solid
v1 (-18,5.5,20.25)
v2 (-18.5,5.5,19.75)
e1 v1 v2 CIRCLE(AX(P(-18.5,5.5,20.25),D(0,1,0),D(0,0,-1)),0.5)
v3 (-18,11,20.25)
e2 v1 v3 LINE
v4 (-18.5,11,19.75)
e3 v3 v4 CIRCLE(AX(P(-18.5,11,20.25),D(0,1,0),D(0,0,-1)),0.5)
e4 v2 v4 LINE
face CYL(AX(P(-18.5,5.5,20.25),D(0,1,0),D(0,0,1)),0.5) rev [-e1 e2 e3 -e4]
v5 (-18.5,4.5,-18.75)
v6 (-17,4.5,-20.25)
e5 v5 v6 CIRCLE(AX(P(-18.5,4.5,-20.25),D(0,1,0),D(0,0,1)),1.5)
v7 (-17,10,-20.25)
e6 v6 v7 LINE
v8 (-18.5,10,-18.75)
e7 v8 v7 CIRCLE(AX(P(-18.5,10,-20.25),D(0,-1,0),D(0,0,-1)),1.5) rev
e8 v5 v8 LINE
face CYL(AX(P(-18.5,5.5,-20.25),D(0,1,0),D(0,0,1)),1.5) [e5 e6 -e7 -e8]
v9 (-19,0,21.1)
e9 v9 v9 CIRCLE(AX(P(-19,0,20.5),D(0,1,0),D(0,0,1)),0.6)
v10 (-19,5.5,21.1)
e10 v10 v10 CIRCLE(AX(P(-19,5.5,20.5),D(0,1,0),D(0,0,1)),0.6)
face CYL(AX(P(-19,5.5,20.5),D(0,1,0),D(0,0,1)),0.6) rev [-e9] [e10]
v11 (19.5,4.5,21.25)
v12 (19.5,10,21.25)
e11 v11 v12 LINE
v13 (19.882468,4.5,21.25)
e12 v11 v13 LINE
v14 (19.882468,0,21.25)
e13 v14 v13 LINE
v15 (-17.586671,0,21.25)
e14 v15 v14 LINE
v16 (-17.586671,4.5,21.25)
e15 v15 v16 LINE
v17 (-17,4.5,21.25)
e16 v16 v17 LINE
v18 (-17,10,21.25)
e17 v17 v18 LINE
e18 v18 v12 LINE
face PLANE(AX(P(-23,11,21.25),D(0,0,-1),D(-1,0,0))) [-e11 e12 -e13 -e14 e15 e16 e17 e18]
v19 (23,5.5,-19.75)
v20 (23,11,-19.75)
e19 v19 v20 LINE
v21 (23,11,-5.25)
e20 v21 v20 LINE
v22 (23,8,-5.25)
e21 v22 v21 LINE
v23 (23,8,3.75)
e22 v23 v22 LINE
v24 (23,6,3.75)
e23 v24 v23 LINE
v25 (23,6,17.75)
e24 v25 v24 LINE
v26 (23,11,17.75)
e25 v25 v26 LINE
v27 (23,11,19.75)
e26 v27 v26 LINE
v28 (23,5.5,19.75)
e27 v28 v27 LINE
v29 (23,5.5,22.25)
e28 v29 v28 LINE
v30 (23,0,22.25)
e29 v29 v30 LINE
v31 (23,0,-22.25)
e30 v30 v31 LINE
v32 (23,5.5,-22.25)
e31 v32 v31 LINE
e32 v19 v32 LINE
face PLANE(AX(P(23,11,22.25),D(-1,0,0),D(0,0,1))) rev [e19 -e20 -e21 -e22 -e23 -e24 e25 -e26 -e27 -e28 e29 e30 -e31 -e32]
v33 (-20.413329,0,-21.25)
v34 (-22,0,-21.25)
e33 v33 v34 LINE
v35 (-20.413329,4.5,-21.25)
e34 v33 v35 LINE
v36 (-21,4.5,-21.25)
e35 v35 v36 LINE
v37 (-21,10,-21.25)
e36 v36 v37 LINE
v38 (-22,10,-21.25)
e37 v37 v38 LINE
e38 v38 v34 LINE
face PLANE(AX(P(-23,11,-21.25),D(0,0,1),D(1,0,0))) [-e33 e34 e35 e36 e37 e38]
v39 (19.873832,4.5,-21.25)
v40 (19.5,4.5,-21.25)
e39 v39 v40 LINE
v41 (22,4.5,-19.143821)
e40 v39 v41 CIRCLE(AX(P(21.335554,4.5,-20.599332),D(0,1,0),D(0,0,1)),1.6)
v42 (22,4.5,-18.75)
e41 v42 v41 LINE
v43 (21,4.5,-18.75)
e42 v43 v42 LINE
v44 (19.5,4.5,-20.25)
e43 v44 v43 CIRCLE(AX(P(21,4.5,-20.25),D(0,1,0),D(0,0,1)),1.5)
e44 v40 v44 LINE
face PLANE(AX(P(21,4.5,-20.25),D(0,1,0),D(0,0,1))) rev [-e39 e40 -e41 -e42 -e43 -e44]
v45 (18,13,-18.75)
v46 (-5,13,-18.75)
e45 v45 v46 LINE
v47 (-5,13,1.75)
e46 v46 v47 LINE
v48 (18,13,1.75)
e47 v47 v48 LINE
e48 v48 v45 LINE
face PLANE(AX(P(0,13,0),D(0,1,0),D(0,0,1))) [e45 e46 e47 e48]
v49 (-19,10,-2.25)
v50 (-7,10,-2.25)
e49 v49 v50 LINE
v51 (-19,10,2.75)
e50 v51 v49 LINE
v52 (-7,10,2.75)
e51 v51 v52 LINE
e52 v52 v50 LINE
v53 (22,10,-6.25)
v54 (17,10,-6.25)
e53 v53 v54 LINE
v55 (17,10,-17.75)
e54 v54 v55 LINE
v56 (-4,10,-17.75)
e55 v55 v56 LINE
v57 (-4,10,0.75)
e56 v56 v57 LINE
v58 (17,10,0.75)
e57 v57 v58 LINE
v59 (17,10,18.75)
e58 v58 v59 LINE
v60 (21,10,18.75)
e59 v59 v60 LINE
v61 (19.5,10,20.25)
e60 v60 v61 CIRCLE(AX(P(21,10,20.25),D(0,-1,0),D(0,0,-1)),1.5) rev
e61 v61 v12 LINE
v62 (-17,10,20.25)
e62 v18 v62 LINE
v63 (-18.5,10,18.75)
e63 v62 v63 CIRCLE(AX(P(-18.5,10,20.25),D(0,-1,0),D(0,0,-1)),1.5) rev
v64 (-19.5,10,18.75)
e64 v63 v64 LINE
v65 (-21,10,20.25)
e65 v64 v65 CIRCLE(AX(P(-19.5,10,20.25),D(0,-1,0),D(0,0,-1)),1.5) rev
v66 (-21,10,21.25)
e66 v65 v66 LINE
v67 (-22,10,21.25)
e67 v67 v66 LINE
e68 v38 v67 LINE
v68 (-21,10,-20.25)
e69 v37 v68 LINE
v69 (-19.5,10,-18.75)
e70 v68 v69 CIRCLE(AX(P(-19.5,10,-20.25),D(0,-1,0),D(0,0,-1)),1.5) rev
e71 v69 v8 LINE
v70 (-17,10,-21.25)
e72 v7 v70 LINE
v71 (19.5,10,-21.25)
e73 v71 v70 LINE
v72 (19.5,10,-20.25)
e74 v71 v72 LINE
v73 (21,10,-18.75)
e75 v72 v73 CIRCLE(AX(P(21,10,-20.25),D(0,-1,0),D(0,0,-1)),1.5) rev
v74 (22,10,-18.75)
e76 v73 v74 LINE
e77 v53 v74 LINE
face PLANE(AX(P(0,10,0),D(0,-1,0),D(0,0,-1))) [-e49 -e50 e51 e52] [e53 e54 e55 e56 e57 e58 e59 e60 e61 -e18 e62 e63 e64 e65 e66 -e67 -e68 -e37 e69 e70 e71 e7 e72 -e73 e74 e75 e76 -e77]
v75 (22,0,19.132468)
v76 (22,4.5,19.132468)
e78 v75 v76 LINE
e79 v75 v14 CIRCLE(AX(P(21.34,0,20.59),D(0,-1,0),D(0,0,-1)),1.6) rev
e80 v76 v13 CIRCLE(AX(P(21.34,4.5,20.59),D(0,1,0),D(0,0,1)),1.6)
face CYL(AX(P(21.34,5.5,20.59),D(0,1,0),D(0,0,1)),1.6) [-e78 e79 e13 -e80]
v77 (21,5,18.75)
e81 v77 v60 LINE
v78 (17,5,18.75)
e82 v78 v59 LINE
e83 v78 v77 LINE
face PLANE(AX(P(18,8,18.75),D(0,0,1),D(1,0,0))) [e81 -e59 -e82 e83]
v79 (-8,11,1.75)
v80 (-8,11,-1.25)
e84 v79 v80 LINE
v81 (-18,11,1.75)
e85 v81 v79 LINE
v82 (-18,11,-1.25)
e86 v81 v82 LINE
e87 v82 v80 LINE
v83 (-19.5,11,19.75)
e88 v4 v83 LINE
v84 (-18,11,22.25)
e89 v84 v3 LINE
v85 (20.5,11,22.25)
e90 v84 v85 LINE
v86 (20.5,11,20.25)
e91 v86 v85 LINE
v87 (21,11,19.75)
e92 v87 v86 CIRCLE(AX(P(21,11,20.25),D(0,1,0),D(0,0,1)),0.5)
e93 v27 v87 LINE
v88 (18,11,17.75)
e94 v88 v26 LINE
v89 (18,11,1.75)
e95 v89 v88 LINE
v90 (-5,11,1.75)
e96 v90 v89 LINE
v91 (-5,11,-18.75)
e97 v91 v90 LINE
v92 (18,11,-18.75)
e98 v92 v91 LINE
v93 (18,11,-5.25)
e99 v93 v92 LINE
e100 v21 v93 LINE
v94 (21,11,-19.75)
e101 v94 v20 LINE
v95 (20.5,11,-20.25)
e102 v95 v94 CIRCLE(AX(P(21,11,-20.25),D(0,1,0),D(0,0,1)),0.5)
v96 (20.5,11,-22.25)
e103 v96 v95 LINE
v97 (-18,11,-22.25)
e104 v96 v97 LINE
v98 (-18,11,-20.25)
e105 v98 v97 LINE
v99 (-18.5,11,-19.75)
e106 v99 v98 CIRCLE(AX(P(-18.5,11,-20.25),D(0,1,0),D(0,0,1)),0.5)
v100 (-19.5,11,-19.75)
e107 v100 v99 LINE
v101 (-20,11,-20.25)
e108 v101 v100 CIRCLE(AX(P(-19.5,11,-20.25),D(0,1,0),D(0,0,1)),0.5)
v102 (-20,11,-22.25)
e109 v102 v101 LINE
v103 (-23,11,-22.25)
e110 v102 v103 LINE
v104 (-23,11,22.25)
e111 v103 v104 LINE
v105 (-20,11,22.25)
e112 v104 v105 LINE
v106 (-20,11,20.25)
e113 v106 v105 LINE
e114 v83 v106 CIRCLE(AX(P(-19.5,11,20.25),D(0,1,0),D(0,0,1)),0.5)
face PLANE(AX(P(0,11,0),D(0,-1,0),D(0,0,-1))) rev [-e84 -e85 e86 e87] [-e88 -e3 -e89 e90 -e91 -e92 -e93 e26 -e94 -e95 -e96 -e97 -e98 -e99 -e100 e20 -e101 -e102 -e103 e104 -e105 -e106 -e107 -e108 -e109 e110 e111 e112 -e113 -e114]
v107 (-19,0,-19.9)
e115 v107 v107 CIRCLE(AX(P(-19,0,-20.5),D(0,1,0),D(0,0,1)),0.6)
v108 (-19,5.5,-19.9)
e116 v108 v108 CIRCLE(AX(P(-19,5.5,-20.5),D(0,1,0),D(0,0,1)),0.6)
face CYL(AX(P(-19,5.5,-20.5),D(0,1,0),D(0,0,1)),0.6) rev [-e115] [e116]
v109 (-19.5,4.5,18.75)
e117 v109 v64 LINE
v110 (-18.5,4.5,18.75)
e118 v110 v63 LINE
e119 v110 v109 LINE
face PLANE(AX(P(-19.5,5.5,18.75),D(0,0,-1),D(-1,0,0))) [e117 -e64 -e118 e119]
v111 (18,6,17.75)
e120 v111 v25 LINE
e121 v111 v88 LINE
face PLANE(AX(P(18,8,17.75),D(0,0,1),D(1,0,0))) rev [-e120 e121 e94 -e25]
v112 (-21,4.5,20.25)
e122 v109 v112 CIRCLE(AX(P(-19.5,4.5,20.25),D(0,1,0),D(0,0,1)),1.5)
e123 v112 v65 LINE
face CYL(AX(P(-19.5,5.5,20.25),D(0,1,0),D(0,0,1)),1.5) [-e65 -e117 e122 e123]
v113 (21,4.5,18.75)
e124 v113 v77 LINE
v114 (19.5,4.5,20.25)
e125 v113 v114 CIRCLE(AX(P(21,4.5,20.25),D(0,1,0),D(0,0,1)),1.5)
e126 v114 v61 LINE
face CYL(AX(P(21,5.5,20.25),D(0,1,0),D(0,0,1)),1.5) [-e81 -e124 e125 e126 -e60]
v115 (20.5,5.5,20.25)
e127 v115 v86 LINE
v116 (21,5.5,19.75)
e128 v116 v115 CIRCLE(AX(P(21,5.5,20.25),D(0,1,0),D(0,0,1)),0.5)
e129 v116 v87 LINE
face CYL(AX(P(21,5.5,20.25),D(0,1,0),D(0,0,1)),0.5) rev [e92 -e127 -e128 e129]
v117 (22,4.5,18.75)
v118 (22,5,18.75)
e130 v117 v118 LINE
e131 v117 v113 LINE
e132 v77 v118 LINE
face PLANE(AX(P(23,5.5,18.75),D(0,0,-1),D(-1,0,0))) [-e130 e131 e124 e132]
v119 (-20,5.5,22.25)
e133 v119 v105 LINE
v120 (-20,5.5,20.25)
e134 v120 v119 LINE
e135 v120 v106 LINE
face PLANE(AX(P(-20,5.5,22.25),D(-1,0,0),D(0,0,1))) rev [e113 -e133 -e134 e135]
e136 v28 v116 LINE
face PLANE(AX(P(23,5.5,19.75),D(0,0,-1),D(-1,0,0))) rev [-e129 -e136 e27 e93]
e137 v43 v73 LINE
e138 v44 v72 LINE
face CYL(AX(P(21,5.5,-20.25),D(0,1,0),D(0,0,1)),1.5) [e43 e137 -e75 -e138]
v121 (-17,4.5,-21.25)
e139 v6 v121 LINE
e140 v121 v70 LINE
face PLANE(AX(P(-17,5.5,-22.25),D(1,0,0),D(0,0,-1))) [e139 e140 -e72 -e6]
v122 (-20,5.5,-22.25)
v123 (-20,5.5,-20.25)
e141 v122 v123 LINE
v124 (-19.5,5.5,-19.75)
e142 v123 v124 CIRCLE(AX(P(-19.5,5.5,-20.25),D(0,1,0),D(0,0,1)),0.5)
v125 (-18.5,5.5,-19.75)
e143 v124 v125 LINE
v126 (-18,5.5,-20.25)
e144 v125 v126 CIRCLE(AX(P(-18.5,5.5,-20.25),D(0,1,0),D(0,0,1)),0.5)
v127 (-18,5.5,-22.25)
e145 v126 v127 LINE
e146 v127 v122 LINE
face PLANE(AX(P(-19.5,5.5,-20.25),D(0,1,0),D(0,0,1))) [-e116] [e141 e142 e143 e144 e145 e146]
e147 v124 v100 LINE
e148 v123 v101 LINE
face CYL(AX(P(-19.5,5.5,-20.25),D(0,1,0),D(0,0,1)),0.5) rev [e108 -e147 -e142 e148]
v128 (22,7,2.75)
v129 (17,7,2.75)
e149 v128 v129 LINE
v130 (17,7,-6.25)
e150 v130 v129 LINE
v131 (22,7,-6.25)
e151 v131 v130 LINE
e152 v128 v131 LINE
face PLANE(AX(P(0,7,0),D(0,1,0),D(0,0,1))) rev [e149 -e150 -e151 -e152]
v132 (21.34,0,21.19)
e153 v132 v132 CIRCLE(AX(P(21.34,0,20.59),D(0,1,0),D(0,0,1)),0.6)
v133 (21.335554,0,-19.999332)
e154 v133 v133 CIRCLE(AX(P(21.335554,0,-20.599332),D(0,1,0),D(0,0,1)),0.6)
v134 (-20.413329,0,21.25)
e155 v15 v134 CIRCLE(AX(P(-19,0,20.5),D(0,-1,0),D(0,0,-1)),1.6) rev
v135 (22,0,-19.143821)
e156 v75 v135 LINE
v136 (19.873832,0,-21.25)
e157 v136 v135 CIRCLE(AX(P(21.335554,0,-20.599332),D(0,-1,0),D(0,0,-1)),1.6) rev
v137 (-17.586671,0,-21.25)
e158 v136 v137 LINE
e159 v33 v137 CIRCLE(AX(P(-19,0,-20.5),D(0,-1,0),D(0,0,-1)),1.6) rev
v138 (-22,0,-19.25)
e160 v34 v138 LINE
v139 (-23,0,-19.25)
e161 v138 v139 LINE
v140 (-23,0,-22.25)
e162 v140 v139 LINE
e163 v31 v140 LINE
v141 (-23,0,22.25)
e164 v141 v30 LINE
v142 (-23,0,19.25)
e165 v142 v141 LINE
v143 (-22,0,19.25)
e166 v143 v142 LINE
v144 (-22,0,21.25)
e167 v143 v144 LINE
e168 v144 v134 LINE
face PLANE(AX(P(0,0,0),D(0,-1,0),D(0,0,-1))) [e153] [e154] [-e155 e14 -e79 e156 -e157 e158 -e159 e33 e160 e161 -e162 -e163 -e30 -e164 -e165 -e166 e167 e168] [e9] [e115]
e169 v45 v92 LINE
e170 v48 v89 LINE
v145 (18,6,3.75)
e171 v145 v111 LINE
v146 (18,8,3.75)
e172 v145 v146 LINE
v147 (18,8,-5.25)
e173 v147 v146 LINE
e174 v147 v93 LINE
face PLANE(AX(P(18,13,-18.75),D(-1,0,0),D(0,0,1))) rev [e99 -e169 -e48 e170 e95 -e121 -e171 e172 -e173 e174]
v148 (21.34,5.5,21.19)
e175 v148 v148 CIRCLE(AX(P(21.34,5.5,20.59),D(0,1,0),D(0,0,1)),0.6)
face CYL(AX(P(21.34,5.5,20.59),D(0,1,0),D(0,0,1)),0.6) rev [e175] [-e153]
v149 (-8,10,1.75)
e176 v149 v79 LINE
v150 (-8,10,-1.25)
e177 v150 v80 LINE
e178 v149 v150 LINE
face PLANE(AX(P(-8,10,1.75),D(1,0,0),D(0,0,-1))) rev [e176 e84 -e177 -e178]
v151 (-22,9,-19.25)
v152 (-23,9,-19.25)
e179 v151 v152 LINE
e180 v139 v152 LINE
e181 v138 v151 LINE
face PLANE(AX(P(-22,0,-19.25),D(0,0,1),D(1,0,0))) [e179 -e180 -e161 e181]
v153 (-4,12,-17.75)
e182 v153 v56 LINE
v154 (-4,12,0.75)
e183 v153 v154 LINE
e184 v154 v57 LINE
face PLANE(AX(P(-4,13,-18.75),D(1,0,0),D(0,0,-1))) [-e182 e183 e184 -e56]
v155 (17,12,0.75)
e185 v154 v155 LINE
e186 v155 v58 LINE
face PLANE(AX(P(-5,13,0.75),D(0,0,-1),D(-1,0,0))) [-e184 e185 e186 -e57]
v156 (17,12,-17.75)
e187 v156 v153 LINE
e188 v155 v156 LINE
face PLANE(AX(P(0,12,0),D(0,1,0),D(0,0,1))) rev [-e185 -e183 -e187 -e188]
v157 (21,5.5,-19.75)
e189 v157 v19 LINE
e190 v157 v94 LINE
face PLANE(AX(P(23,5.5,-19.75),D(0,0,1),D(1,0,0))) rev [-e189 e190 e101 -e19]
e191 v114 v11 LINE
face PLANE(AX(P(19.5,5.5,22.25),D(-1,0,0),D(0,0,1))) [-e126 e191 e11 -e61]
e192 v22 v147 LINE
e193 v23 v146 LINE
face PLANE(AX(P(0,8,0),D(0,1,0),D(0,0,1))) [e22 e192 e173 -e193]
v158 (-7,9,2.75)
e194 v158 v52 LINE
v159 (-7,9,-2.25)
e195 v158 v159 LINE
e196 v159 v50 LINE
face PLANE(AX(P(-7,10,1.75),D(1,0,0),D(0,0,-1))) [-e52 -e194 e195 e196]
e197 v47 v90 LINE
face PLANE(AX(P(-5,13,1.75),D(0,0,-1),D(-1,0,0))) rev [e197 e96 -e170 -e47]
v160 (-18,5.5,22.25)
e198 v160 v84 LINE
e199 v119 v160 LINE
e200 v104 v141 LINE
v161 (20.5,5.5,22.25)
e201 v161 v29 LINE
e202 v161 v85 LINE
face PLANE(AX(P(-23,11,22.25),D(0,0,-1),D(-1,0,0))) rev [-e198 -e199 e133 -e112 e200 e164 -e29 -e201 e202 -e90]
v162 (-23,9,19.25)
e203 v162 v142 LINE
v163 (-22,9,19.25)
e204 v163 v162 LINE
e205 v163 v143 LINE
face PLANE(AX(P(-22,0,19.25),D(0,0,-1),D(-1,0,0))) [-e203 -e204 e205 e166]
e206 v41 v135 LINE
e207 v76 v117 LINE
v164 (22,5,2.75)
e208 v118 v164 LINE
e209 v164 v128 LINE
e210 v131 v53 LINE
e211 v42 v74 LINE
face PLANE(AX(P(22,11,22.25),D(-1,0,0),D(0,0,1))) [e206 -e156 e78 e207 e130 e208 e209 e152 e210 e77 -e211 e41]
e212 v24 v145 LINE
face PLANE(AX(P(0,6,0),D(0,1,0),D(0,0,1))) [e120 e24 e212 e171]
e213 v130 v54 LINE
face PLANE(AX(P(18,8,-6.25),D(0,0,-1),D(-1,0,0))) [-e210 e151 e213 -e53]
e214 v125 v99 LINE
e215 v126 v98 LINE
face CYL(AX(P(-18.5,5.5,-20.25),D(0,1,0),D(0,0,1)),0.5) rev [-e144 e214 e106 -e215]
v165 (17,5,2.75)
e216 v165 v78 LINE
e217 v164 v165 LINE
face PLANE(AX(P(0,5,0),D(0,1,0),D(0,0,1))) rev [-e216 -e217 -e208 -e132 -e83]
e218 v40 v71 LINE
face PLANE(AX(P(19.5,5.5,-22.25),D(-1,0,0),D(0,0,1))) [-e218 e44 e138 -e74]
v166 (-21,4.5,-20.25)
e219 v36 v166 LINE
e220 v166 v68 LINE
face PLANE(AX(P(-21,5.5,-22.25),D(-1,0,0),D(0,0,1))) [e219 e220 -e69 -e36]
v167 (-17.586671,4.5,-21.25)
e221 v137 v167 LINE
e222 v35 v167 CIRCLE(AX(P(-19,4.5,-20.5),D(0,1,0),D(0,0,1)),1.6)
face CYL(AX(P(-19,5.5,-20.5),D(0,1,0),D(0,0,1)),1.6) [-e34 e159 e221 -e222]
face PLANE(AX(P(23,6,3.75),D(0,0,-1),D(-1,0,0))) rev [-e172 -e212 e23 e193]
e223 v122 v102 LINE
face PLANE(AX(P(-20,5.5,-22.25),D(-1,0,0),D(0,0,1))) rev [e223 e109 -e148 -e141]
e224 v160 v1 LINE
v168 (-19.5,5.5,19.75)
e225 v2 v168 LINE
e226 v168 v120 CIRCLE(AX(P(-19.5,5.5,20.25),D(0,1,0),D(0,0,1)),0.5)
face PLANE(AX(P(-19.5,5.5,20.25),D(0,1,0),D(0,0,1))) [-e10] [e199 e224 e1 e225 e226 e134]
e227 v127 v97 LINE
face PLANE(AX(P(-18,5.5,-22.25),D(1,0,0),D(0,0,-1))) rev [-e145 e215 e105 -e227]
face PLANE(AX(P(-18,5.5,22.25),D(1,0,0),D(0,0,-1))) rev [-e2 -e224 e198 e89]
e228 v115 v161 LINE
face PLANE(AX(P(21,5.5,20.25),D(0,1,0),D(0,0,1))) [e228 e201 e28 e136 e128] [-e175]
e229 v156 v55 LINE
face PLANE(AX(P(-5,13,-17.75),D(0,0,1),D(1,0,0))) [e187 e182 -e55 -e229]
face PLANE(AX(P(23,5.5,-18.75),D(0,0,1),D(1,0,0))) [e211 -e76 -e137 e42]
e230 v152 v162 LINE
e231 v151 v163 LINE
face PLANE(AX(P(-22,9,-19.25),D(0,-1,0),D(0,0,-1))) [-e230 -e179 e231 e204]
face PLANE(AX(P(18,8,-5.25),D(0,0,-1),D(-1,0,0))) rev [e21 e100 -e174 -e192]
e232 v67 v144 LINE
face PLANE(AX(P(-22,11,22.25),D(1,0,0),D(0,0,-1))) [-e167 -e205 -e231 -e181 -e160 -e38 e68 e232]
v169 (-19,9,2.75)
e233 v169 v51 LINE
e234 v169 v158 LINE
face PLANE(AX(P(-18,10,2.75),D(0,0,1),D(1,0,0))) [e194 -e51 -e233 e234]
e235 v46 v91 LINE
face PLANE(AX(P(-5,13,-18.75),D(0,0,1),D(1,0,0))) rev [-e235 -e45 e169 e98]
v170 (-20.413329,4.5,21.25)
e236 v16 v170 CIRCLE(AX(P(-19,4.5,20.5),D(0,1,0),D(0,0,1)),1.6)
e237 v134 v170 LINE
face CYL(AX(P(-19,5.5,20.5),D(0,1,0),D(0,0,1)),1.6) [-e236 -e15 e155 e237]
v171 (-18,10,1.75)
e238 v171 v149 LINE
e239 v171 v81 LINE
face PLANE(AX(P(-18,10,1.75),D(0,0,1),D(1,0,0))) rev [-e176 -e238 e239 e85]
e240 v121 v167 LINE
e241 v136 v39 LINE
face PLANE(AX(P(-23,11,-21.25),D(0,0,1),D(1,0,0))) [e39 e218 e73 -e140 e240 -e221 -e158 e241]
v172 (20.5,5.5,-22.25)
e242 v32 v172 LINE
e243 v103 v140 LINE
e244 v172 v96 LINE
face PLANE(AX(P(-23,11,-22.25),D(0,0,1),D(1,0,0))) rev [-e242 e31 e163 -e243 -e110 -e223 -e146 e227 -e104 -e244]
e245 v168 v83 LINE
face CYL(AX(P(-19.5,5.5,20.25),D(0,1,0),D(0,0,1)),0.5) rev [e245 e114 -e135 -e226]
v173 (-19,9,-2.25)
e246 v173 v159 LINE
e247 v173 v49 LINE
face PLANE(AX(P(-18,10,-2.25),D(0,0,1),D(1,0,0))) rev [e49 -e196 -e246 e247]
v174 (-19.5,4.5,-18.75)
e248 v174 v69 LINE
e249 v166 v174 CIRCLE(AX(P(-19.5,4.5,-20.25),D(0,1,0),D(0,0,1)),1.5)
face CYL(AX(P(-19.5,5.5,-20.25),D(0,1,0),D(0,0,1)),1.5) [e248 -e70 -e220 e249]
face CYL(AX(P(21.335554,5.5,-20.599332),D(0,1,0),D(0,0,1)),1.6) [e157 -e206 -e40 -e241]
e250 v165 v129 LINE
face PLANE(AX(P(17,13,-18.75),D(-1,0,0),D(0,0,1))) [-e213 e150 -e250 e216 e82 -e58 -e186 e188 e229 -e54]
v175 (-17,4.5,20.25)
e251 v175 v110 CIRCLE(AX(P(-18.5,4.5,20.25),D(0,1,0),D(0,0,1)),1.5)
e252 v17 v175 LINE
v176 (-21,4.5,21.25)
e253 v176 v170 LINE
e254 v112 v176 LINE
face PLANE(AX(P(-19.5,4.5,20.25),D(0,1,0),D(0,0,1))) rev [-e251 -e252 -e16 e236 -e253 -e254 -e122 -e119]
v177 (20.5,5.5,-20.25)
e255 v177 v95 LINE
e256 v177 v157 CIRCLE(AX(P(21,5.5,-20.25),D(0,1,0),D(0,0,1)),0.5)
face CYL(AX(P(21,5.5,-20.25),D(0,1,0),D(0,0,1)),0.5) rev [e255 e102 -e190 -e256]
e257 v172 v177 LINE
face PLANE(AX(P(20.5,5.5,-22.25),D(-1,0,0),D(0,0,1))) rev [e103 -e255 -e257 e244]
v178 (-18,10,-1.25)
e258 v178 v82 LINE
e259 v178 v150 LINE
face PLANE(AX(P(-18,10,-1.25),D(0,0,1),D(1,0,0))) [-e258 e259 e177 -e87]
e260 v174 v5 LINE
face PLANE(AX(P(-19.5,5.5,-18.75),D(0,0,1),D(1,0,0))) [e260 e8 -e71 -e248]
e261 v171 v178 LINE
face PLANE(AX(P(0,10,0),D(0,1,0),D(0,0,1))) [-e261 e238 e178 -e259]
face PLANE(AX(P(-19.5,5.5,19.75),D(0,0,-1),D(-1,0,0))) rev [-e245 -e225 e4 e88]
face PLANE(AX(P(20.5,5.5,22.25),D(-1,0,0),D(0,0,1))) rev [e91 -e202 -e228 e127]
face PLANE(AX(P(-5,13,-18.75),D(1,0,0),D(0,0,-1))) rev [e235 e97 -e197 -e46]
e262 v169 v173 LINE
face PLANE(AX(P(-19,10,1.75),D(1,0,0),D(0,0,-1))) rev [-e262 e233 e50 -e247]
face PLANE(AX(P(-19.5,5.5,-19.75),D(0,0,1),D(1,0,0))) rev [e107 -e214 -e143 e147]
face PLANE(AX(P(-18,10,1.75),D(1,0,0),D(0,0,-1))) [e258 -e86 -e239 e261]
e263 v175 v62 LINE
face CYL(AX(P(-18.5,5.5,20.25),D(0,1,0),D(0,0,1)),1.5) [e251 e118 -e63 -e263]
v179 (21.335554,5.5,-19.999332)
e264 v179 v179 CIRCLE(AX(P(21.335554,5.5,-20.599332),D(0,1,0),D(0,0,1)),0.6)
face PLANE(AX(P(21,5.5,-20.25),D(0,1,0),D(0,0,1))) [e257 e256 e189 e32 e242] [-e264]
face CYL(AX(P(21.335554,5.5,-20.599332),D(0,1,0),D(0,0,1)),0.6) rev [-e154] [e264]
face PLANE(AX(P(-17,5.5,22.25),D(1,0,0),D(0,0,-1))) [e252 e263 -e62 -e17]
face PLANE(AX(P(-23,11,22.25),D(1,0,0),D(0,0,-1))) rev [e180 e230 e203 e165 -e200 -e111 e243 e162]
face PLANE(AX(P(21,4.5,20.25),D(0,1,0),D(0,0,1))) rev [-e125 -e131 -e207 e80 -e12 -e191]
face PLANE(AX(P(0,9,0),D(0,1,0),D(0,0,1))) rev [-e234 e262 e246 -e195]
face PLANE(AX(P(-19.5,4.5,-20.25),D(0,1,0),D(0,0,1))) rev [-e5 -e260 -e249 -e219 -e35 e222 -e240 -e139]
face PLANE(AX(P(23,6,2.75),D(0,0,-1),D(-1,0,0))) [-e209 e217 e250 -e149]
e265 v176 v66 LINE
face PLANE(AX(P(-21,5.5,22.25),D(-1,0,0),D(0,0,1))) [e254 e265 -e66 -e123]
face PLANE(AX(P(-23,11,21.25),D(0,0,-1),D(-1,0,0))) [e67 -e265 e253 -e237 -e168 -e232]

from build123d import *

# Parameters (mm, degrees)
SCHIZZO1_W                   = 46
SCHIZZO1_H                   = 44.5
ESTRUSIONE_ESTRUSIONE1_DEPTH = 11
SCHIZZO2_W                   = 23
SCHIZZO2_H                   = 20.5
ESTRUSIONE_ESTRUSIONE2_DEPTH = 2
TAGLIO_ESTRUSIONE1_DEPTH     = 5.5
SCHIZZO5_W                   = 38.5
SCHIZZO5_H                   = 9
TAGLIO_ESTRUSIONE2_DEPTH     = 1
SCHIZZO9_W                   = 10
SCHIZZO9_H                   = 3
TAGLIO_ESTRUSIONE4_DEPTH     = 1
SCHIZZO10_W                  = 5
SCHIZZO10_H                  = 23
TAGLIO_ESTRUSIONE5_DEPTH     = 3
SCHIZZO11_W                  = 5
SCHIZZO11_H                  = 14
TAGLIO_ESTRUSIONE6_DEPTH     = 2
FORO_PER_VITE_M1_2_D         = 1.2
SVUOTA3_OUTLINE_W            = 12
SVUOTA3_OUTLINE_H            = 5
SVUOTA3_DEPTH                = 10
SVUOTA3_2_OUTLINE_W          = 5
SVUOTA3_2_OUTLINE_H          = 25
SVUOTA3_2_OUTLINE_W_2        = 12
SVUOTA3_2_OUTLINE_H_2        = 5
SVUOTA3_2_DEPTH              = 5
SVUOTA3_START                = 10
SVUOTA3_3_OUTLINE_W          = 21
SVUOTA3_3_OUTLINE_H          = 18.5
SVUOTA3_3_DEPTH              = 2
SVUOTA3_START_2              = 5
SVUOTA3_4_OUTLINE_W          = 12
SVUOTA3_4_OUTLINE_H          = 5
SVUOTA3_4_DEPTH              = 4
SVUOTA3_5_OUTLINE_W          = 5
SVUOTA3_5_OUTLINE_H          = 9
SVUOTA3_5_DEPTH              = 2
SVUOTA3_6_DEPTH              = 4.5


# Read off the part's stored shape, not the designer's step: Svuota3
with BuildPart() as part:
    # Schizzo1 → Estrusione-Estrusione1 (new body)
    with BuildSketch(Plane(origin=(0, 0, 0), x_dir=(1, 0, 0), z_dir=(0, 1, 0))):
        Rectangle(SCHIZZO1_W, SCHIZZO1_H)
    extrude(amount=ESTRUSIONE_ESTRUSIONE1_DEPTH)

    # Schizzo2 → Estrusione-Estrusione2 (add)
    with BuildSketch(Plane(origin=(0, 11, 0), x_dir=(1, 0, 0), z_dir=(0, 1, 0))):
        with Locations((6.5, 8.5)):
            Rectangle(SCHIZZO2_W, SCHIZZO2_H)
    extrude(amount=ESTRUSIONE_ESTRUSIONE2_DEPTH)

    # Schizzo3 → Taglio-Estrusione1 (cut)
    with BuildSketch(Plane(origin=(0, 11, 0), x_dir=(1, 0, 0), z_dir=(0, 1, 0))):
        with BuildLine():
            Line((23, 22.25), (20.5, 22.25))
            Line((20.5, 22.25), (20.5, 20.25))
            ThreePointArc((20.5, 20.25), (20.646446609, 19.896446609), (21, 19.75))
            Line((21, 19.75), (23, 19.75))
            Line((23, 19.75), (23, 22.25))
        make_face()
        with BuildLine():
            Line((23, -22.25), (20.5, -22.25))
            Line((20.5, -22.25), (20.5, -20.25))
            ThreePointArc((20.5, -20.25), (20.646446609, -19.896446609), (21, -19.75))
            Line((21, -19.75), (23, -19.75))
            Line((23, -19.75), (23, -22.25))
        make_face()
        with BuildLine():
            Line((-20, 22.25), (-18, 22.25))
            Line((-18, 22.25), (-18, 20.25))
            ThreePointArc((-18, 20.25), (-18.146446609, 19.896446609), (-18.5, 19.75))
            Line((-18.5, 19.75), (-19.5, 19.75))
            ThreePointArc((-19.5, 19.75), (-19.853553391, 19.896446609), (-20, 20.25))
            Line((-20, 20.25), (-20, 22.25))
        make_face()
        with BuildLine():
            Line((-20, -22.25), (-18, -22.25))
            Line((-18, -22.25), (-18, -20.25))
            ThreePointArc((-18, -20.25), (-18.146446609, -19.896446609), (-18.5, -19.75))
            Line((-18.5, -19.75), (-19.5, -19.75))
            ThreePointArc((-19.5, -19.75), (-19.853553391, -19.896446609), (-20, -20.25))
            Line((-20, -20.25), (-20, -22.25))
        make_face()
    extrude(amount=-TAGLIO_ESTRUSIONE1_DEPTH, mode=Mode.SUBTRACT)

    # Schizzo5 → Taglio-Estrusione2 (cut)
    with BuildSketch(Plane(origin=(-23, 0, -0.75), x_dir=(0, 0, -1), z_dir=(1, 0, 0))):
        with Locations((-0.75, 4.5)):
            Rectangle(SCHIZZO5_W, SCHIZZO5_H)
    extrude(amount=TAGLIO_ESTRUSIONE2_DEPTH, mode=Mode.SUBTRACT)

    # Schizzo9 → Taglio-Estrusione4 (cut)
    with BuildSketch(Plane(origin=(0, 11, 0), x_dir=(1, 0, 0), z_dir=(0, 1, 0))):
        with Locations((-13, -0.25)):
            Rectangle(SCHIZZO9_W, SCHIZZO9_H)
    extrude(amount=-TAGLIO_ESTRUSIONE4_DEPTH, mode=Mode.SUBTRACT)

    # Schizzo10 → Taglio-Estrusione5 (cut)
    with BuildSketch(Plane(origin=(0, 11, 0), x_dir=(1, 0, 0), z_dir=(0, 1, 0))):
        with Locations((20.5, -6.25)):
            Rectangle(SCHIZZO10_W, SCHIZZO10_H)
    extrude(amount=-TAGLIO_ESTRUSIONE5_DEPTH, mode=Mode.SUBTRACT)

    # Schizzo11 → Taglio-Estrusione6 (cut)
    with BuildSketch(Plane(origin=(0, 8, 0), x_dir=(1, 0, 0), z_dir=(0, 1, 0))):
        with Locations((20.5, -10.75)):
            Rectangle(SCHIZZO11_W, SCHIZZO11_H)
    extrude(amount=-TAGLIO_ESTRUSIONE6_DEPTH, mode=Mode.SUBTRACT)

    # Foro per Vite M1-2 (through all)
    with Locations(Plane(origin=(0, 5.5, 0), x_dir=(1, 0, 0), z_dir=(0, 1, 0))):
        with Locations((21.34, -20.59), (21.335553897, 20.599331768), (-19, 20.5), (-19, -20.5)):
            Hole(FORO_PER_VITE_M1_2_D / 2)

    # Svuota3 outline → Svuota3 (cut)
    with BuildSketch(Plane(origin=(0, 0, 0), x_dir=(1, 0, 0), z_dir=(0, 1, 0))):
        with BuildLine():
            Line((22, 6.25), (22, 18.75))
            Line((22, 18.75), (21, 18.75))
            ThreePointArc((21, 18.75), (19.939339828, 19.189339828), (19.5, 20.25))
            Line((19.5, 20.25), (19.5, 21.25))
            Line((19.5, 21.25), (-17, 21.25))
            Line((-17, 21.25), (-17, 20.25))
            ThreePointArc((-17, 20.25), (-17.439339828, 19.189339828), (-18.5, 18.75))
            Line((-18.5, 18.75), (-19.5, 18.75))
            ThreePointArc((-19.5, 18.75), (-20.560660172, 19.189339828), (-21, 20.25))
            Line((-21, 20.25), (-21, 21.25))
            Line((-21, 21.25), (-22, 21.25))
            Line((-22, 21.25), (-22, -21.25))
            Line((-22, -21.25), (-21, -21.25))
            Line((-21, -21.25), (-21, -20.25))
            ThreePointArc((-21, -20.25), (-20.560660172, -19.189339828), (-19.5, -18.75))
            Line((-19.5, -18.75), (-18.5, -18.75))
            ThreePointArc((-18.5, -18.75), (-17.439339828, -19.189339828), (-17, -20.25))
            Line((-17, -20.25), (-17, -21.25))
            Line((-17, -21.25), (19.5, -21.25))
            Line((19.5, -21.25), (19.5, -20.25))
            ThreePointArc((19.5, -20.25), (19.939339828, -19.189339828), (21, -18.75))
            Line((21, -18.75), (17, -18.75))
            Line((17, -18.75), (17, 6.25))
            Line((17, 6.25), (22, 6.25))
        make_face()
        with Locations((-13, -0.25)):
            Rectangle(SVUOTA3_OUTLINE_W, SVUOTA3_OUTLINE_H, mode=Mode.SUBTRACT)
    extrude(amount=SVUOTA3_DEPTH, mode=Mode.SUBTRACT)

    # Svuota3 2 outline → Svuota3 2 (cut)
    with BuildSketch(Plane(origin=(0, 0, 0), x_dir=(1, 0, 0), z_dir=(0, 1, 0))):
        with Locations((19.5, -6.25)):
            Rectangle(SVUOTA3_2_OUTLINE_W, SVUOTA3_2_OUTLINE_H)
        with Locations((-13, -0.25)):
            Rectangle(SVUOTA3_2_OUTLINE_W_2, SVUOTA3_2_OUTLINE_H_2)
    extrude(amount=SVUOTA3_2_DEPTH, mode=Mode.SUBTRACT)

    # Svuota3 3 outline → Svuota3 3 (cut)
    with BuildSketch(Plane(origin=(0, 0, 0), x_dir=(1, 0, 0), z_dir=(0, 1, 0)).offset(SVUOTA3_START)):
        with Locations((6.5, 8.5)):
            Rectangle(SVUOTA3_3_OUTLINE_W, SVUOTA3_3_OUTLINE_H)
    extrude(amount=SVUOTA3_3_DEPTH, mode=Mode.SUBTRACT)

    # Svuota3 4 outline → Svuota3 4 (cut)
    with BuildSketch(Plane(origin=(0, 0, 0), x_dir=(1, 0, 0), z_dir=(0, 1, 0)).offset(SVUOTA3_START_2)):
        with Locations((-13, -0.25)):
            Rectangle(SVUOTA3_4_OUTLINE_W, SVUOTA3_4_OUTLINE_H)
    extrude(amount=SVUOTA3_4_DEPTH, mode=Mode.SUBTRACT)

    # Svuota3 5 outline → Svuota3 5 (cut)
    with BuildSketch(Plane(origin=(0, 0, 0), x_dir=(1, 0, 0), z_dir=(0, 1, 0)).offset(SVUOTA3_START_2)):
        with Locations((19.5, 1.75)):
            Rectangle(SVUOTA3_5_OUTLINE_W, SVUOTA3_5_OUTLINE_H)
    extrude(amount=SVUOTA3_5_DEPTH, mode=Mode.SUBTRACT)

    # Svuota3 6 outline → Svuota3 6 (cut)
    with BuildSketch(Plane(origin=(0, 0, 0), x_dir=(1, 0, 0), z_dir=(0, 1, 0))):
        with BuildLine():
            Line((22, 18.75), (22, 19.143821075))
            ThreePointArc((22, 19.143821075), (20.209538985, 19.462630216), (19.873832018, 21.25))
            Line((19.873832018, 21.25), (19.5, 21.25))
            Line((19.5, 21.25), (19.5, 20.25))
            ThreePointArc((19.5, 20.25), (19.939339828, 19.189339828), (21, 18.75))
            Line((21, 18.75), (22, 18.75))
        make_face()
        with BuildLine():
            Line((-17, 20.25), (-17, 21.25))
            Line((-17, 21.25), (-17.586670597, 21.25))
            ThreePointArc((-17.586670597, 21.25), (-19, 18.9), (-20.413329403, 21.25))
            Line((-20.413329403, 21.25), (-21, 21.25))
            Line((-21, 21.25), (-21, 20.25))
            ThreePointArc((-21, 20.25), (-20.560660172, 19.189339828), (-19.5, 18.75))
            Line((-19.5, 18.75), (-18.5, 18.75))
            ThreePointArc((-18.5, 18.75), (-17.439339828, 19.189339828), (-17, 20.25))
        make_face()
        with BuildLine():
            Line((22, -19.132467839), (22, -18.75))
            Line((22, -18.75), (21, -18.75))
            ThreePointArc((21, -18.75), (19.939339828, -19.189339828), (19.5, -20.25))
            Line((19.5, -20.25), (19.5, -21.25))
            Line((19.5, -21.25), (19.882467839, -21.25))
            ThreePointArc((19.882467839, -21.25), (20.20862915, -19.45862915), (22, -19.132467839))
        make_face()
        with BuildLine():
            Line((-17.586670597, -21.25), (-17, -21.25))
            Line((-17, -21.25), (-17, -20.25))
            ThreePointArc((-17, -20.25), (-17.439339828, -19.189339828), (-18.5, -18.75))
            Line((-18.5, -18.75), (-19.5, -18.75))
            ThreePointArc((-19.5, -18.75), (-20.560660172, -19.189339828), (-21, -20.25))
            Line((-21, -20.25), (-21, -21.25))
            Line((-21, -21.25), (-20.413329403, -21.25))
            ThreePointArc((-20.413329403, -21.25), (-19, -18.9), (-17.586670597, -21.25))
        make_face()
    extrude(amount=SVUOTA3_6_DEPTH, mode=Mode.SUBTRACT)


solid = part.part
